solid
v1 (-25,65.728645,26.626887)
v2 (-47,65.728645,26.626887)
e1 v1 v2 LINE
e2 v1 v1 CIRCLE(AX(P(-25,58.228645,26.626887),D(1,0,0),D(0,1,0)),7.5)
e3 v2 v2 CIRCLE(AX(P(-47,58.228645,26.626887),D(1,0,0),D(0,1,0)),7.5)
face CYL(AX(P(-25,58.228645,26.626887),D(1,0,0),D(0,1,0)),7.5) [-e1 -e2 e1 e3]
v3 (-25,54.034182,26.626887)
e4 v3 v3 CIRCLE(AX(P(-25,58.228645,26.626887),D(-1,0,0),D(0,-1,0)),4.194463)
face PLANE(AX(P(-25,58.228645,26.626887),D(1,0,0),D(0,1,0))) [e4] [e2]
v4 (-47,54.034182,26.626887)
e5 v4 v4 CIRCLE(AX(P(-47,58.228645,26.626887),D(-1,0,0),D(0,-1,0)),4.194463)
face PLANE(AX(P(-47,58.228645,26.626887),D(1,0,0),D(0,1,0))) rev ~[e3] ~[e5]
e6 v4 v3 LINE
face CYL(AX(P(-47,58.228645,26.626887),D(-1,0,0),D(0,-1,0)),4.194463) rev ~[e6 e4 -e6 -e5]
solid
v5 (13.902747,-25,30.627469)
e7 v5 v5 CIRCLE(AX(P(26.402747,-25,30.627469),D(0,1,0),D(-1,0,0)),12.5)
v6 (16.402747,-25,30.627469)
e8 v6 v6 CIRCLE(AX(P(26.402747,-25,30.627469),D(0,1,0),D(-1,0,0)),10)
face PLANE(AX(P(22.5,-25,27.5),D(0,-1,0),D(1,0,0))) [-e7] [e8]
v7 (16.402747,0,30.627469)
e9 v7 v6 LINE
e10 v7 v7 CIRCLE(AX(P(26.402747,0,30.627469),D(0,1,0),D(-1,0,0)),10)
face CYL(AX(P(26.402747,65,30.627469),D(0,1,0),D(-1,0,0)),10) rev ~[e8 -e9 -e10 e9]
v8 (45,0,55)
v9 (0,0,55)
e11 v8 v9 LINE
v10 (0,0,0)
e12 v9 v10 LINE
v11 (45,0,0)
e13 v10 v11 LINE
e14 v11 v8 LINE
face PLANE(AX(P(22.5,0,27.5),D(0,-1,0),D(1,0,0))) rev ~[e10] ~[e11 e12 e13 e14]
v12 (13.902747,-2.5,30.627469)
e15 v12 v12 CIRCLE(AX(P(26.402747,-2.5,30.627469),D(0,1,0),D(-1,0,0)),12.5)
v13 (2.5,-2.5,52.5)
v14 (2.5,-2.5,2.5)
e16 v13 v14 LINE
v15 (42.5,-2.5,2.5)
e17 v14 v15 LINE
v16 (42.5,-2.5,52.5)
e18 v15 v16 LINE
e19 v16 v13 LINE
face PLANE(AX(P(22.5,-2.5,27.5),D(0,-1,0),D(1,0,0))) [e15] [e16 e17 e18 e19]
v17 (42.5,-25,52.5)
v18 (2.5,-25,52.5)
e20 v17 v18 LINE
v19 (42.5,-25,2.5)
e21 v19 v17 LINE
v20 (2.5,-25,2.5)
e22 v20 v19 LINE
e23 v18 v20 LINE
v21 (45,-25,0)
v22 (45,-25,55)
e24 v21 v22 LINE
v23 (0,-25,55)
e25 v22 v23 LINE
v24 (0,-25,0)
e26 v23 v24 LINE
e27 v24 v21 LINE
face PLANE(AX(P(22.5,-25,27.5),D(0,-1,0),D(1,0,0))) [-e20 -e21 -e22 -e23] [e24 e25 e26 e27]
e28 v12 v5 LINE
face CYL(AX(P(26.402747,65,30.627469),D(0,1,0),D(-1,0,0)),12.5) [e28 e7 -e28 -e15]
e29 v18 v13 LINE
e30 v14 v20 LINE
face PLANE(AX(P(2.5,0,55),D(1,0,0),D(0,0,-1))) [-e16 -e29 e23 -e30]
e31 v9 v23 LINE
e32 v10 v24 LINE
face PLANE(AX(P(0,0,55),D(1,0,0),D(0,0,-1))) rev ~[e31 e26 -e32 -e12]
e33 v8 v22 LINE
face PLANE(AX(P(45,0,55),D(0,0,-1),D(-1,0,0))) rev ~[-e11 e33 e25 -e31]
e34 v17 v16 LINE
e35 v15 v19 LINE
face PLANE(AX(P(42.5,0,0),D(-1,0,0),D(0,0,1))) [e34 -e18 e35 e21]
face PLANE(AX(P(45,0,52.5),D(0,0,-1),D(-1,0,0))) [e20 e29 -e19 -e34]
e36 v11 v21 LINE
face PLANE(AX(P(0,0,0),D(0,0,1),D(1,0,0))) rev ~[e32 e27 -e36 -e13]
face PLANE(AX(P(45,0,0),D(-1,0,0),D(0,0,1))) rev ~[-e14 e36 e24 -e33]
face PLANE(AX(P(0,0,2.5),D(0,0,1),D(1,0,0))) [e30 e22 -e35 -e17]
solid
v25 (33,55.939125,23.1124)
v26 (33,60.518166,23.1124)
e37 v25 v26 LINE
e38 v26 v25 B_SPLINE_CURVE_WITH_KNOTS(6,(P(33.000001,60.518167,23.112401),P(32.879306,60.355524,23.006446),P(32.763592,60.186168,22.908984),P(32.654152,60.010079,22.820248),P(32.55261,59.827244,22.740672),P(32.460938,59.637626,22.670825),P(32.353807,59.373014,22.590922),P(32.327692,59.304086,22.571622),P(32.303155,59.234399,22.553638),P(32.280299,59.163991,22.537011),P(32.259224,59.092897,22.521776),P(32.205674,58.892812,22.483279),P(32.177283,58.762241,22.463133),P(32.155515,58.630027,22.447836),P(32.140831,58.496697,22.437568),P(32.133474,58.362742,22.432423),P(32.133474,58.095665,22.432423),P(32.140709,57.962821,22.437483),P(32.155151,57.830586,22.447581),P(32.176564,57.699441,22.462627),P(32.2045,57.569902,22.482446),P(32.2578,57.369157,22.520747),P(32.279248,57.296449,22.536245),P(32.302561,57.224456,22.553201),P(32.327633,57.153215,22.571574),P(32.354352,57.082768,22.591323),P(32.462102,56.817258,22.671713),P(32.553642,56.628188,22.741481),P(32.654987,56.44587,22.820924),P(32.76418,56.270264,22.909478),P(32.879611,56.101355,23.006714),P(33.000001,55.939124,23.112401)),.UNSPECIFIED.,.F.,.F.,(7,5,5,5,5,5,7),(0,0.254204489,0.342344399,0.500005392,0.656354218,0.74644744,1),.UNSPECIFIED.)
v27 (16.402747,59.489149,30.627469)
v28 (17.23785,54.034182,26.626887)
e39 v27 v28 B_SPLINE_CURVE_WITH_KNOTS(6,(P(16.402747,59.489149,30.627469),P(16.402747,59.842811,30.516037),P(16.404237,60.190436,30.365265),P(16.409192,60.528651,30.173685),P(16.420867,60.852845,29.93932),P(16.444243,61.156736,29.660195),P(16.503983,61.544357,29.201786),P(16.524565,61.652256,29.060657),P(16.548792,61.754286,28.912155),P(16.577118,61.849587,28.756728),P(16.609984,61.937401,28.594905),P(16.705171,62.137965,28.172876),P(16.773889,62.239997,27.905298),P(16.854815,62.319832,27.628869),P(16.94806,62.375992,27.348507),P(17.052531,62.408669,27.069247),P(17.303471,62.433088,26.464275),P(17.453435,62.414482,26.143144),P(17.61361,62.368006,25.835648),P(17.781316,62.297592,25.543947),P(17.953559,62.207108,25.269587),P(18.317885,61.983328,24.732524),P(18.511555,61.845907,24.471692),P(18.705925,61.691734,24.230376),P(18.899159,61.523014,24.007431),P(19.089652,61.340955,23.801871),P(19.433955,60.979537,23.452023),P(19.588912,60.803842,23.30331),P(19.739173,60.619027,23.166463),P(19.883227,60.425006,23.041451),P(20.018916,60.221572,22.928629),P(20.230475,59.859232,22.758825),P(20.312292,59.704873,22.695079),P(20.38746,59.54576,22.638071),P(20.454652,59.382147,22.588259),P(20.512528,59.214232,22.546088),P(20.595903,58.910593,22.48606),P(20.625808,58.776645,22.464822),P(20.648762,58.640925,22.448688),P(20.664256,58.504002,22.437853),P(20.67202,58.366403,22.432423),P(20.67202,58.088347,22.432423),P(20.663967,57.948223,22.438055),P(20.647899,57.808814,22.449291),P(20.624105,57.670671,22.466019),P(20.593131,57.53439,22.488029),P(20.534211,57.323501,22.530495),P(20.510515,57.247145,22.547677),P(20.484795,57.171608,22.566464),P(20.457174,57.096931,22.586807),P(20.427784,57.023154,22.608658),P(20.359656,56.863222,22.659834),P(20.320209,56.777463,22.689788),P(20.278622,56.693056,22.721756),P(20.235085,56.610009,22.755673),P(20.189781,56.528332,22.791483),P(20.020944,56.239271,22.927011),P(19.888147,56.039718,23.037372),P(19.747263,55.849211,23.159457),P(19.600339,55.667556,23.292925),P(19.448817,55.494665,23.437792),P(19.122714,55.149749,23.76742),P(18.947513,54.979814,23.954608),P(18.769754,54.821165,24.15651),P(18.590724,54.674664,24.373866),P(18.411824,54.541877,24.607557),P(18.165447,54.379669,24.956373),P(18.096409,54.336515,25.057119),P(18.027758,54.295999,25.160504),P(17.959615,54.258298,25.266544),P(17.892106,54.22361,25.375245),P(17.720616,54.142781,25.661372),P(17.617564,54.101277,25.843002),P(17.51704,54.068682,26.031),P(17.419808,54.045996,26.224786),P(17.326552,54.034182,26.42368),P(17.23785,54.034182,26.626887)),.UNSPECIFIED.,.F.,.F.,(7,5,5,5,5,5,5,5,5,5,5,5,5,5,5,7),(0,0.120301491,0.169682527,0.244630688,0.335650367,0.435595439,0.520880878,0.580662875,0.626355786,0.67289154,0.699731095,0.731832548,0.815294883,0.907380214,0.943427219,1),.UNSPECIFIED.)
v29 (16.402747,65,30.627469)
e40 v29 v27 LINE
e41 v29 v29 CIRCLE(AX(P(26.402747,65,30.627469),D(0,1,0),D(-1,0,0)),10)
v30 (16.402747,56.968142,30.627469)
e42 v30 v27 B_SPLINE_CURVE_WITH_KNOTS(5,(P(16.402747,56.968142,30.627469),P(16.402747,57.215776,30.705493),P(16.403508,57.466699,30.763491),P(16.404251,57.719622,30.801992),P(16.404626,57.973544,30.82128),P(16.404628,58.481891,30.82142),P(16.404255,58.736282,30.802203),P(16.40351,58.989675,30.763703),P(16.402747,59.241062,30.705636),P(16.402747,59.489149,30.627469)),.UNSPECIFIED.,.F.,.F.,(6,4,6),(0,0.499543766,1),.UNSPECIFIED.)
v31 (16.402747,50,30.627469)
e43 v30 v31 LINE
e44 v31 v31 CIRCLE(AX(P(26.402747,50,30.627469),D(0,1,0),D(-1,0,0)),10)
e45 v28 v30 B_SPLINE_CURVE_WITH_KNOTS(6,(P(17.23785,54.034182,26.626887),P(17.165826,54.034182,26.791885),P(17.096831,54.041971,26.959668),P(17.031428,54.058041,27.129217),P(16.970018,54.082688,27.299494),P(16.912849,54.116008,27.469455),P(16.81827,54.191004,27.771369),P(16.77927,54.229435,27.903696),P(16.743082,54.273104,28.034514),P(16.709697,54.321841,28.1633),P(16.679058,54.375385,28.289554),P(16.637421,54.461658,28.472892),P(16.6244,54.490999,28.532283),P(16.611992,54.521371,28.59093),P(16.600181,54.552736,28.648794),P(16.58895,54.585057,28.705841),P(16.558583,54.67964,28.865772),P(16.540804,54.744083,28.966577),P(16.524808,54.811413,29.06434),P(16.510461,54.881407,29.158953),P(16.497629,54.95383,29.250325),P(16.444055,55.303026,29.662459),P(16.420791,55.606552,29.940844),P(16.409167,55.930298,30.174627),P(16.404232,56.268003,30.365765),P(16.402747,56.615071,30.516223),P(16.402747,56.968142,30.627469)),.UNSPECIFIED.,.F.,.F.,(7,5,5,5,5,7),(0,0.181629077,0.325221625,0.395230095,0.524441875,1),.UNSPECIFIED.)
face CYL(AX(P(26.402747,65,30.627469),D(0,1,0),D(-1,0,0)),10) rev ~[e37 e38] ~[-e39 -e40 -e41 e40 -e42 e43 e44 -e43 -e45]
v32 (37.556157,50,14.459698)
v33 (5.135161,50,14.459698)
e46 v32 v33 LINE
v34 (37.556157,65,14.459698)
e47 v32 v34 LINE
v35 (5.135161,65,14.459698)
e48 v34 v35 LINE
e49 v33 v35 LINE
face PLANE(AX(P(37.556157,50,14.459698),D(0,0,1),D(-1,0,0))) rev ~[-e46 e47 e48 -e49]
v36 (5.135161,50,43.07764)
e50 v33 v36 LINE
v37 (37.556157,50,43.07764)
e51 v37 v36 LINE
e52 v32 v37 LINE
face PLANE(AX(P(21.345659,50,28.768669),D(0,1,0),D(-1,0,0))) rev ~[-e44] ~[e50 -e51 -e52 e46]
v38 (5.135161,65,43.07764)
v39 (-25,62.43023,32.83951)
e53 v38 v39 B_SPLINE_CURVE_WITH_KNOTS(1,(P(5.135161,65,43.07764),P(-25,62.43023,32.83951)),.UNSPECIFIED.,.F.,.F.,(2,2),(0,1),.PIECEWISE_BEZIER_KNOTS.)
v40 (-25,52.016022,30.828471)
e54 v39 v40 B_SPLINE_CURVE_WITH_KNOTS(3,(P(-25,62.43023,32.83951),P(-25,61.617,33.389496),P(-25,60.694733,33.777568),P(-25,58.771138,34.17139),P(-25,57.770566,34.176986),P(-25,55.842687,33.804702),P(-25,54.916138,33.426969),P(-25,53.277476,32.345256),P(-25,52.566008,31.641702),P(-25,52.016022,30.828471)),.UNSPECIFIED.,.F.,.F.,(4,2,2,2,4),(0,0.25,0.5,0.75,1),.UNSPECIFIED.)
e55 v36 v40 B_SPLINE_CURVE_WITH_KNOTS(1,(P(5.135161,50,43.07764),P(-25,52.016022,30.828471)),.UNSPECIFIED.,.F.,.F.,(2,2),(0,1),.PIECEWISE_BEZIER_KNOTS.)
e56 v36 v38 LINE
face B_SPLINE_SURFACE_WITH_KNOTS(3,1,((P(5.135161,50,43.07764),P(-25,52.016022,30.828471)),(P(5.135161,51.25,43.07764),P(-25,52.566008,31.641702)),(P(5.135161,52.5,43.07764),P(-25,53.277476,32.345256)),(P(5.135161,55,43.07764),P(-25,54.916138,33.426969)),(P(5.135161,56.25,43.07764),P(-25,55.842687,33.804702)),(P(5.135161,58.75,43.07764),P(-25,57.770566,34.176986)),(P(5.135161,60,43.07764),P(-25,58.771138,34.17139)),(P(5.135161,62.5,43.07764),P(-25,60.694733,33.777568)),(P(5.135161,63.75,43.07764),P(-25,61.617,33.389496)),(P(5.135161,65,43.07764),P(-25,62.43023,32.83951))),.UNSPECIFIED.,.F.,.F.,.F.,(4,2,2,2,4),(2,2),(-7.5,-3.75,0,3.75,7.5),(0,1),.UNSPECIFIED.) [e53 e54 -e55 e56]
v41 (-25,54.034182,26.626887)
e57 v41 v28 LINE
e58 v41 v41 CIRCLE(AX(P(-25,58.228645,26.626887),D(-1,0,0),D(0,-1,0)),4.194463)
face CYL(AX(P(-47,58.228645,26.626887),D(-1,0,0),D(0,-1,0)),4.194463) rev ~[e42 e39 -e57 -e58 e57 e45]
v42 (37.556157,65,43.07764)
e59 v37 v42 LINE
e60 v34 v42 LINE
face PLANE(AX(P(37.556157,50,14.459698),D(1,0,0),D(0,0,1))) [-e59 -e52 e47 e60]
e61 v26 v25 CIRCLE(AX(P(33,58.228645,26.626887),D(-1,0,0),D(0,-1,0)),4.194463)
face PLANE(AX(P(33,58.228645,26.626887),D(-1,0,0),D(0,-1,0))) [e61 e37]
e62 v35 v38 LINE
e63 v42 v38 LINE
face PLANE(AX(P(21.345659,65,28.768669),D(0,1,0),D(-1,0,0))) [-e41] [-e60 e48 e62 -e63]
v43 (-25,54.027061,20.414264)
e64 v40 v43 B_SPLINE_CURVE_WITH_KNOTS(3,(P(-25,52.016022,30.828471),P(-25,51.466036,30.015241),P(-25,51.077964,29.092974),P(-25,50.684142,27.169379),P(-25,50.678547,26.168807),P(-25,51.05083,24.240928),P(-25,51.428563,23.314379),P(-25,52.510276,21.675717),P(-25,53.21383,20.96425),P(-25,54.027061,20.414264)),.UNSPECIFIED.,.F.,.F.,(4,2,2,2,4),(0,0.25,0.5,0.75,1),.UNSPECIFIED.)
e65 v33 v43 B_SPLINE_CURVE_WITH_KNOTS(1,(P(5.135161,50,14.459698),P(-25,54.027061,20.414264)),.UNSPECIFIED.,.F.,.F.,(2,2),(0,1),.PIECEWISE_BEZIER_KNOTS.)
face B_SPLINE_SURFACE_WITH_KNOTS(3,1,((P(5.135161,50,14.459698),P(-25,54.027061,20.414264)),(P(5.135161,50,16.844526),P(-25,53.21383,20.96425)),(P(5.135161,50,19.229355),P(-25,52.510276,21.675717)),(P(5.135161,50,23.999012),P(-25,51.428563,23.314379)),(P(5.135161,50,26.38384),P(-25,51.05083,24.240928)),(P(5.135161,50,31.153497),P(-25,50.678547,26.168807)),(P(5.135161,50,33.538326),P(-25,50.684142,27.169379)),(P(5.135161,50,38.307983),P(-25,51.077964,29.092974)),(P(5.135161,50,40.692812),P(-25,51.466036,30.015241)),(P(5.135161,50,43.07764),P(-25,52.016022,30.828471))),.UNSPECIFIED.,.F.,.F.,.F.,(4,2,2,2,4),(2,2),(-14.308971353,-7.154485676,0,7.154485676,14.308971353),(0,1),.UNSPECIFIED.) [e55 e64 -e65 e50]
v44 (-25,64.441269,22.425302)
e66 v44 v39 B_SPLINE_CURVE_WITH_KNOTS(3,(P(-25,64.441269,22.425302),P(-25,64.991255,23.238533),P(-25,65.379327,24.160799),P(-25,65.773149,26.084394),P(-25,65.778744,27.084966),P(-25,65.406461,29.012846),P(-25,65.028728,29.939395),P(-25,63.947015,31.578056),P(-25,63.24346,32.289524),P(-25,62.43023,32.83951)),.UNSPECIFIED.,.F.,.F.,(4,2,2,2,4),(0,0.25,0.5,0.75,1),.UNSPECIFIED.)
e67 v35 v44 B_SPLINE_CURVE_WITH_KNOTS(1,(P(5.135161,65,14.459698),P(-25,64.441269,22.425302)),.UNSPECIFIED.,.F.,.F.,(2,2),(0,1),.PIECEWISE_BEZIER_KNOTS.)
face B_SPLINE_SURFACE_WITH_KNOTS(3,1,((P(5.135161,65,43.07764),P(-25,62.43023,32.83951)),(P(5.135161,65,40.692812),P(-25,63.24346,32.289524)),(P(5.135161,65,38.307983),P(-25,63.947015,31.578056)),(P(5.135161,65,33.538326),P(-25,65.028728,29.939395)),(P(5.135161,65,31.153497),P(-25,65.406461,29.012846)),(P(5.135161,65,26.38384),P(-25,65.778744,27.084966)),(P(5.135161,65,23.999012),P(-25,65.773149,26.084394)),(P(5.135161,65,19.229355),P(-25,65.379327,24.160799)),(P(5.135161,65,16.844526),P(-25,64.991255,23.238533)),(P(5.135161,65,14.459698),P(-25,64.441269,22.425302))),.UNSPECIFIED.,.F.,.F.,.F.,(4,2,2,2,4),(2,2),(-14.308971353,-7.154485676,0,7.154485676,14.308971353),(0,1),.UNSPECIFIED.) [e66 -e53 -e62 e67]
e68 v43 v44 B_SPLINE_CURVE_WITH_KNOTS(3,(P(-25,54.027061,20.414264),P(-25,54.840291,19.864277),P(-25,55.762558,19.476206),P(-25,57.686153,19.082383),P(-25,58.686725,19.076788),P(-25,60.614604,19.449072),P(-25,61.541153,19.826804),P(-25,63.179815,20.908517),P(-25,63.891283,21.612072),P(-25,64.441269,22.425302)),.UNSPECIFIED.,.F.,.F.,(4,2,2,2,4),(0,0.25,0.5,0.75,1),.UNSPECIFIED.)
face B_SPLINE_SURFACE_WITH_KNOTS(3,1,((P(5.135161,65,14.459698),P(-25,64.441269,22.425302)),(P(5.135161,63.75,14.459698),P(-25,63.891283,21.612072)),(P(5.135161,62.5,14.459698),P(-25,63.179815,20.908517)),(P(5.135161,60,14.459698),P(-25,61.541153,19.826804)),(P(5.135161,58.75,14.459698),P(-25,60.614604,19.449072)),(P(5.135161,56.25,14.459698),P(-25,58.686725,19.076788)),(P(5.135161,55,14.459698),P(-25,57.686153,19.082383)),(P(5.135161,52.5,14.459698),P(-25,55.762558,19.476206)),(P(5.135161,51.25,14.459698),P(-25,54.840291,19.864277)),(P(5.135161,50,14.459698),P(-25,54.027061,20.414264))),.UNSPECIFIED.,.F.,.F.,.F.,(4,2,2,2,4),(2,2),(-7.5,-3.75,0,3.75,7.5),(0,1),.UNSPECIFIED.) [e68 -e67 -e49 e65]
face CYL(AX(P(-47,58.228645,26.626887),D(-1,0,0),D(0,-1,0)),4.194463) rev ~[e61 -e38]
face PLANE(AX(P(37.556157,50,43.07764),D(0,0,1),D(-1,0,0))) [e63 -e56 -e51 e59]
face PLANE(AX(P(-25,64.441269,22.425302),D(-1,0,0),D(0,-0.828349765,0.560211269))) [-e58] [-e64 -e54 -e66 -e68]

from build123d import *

# Parameters (mm, degrees)
F1_DEPTH  = 25
F4_W      = 32.4209956452
F4_H      = 28.6179427058
F5_DEPTH  = 15
F8_R      = 7.5
F9_DEPTH  = 22
F5_FACE_W = 15
F5_FACE_H = 28.6179427058
F12_R     = 5.1897115041
F13_DEPTH = 25
F14_R     = 10
F15_DEPTH = 200
F16_R     = 4.1944634135
F17_DEPTH = 80
F18_T     = -2.5


# Not quite as in the source:
# - the arcs of a loft's sections are written as splines that run evenly, so that the points pair up as in the source's solid
# - a feature names something its author has since deleted; it is built from what else it names
# - the program builds the solid bodies; features that only make, move or delete a surface that nothing else refers to are left out


with BuildPart() as f1:
    # F0 (on Front) → F1 (new body)
    with BuildSketch(Plane.XZ):
        Polygon((0, 55), (0, 0), (45, 0), (45, 55), (31.3274413347, 55), (12.6162180677, 55), align=None)
    extrude(amount=F1_DEPTH)

    # F12 (on face) → F13 (cut)
    with BuildSketch(Plane(origin=(44.024232716, 6.5541899568, 0), x_dir=(-0.1472539216, 0.9890987224, 0), z_dir=(0.9890987224, 0.1472539216, 0))):
        with Locations((18.0149693042, 30.8930817991)):
            Circle(F12_R)
    extrude(amount=-F13_DEPTH, mode=Mode.SUBTRACT)


with BuildPart() as f5:
    # F4 (on offset) → F5 (new body)
    with BuildSketch(Plane(origin=(0, 50, 0), x_dir=(-1, 0, 0), z_dir=(0, 1, 0))):
        with Locations((-21.3456586935, 28.7686688825)):
            Rectangle(F4_W, F4_H)
    extrude(amount=F5_DEPTH)

    # F5_face (on face) → F10 section 0
    with BuildSketch(Plane(origin=(5.1351608709, 57.5, 28.7686688825), x_dir=(0, -1, 0), z_dir=(-1, 0, 0))):
        Rectangle(F5_FACE_W, F5_FACE_H)
    # F9_face (on face) → F10 section 1
    with BuildSketch(Plane(origin=(-25, 58.2286454737, 26.6268867999), x_dir=(0, 1, 0), z_dir=(1, 0, 0))):
        with BuildLine():
            add(Edge.make_bspline(
                [(-4.2015845208, -6.2126232394), (-3.3883540404, -6.7626093671), (-2.4660875327, -7.1506811449), (-0.5424923825, -7.5445033349), (0.4580794074, -7.5500987948), (2.385958823, -7.177815061), (3.3125079103, -6.800082345), (4.9511694264, -5.7183695112), (5.6626371118, -5.0148150011), (6.2126232394, -4.2015845208)],
                knots=[0, 0, 0, 0, 0.25, 0.25, 0.5, 0.5, 0.75, 0.75, 1, 1, 1, 1], degree=3))
            add(Edge.make_bspline(
                [(6.2126232394, -4.2015845208), (6.7626093671, -3.3883540404), (7.1506811449, -2.4660875327), (7.5445033349, -0.5424923825), (7.5500987948, 0.4580794074), (7.177815061, 2.385958823), (6.800082345, 3.3125079103), (5.7183695112, 4.9511694264), (5.0148150011, 5.6626371118), (4.2015845208, 6.2126232394)],
                knots=[0, 0, 0, 0, 0.25, 0.25, 0.5, 0.5, 0.75, 0.75, 1, 1, 1, 1], degree=3))
            add(Edge.make_bspline(
                [(4.2015845208, 6.2126232394), (3.3883540404, 6.7626093671), (2.4660875327, 7.1506811449), (0.5424923825, 7.5445033349), (-0.4580794074, 7.5500987948), (-2.385958823, 7.177815061), (-3.3125079103, 6.800082345), (-4.9511694264, 5.7183695112), (-5.6626371118, 5.0148150011), (-6.2126232394, 4.2015845208)],
                knots=[0, 0, 0, 0, 0.25, 0.25, 0.5, 0.5, 0.75, 0.75, 1, 1, 1, 1], degree=3))
            add(Edge.make_bspline(
                [(-6.2126232394, 4.2015845208), (-6.7626093671, 3.3883540404), (-7.1506811449, 2.4660875327), (-7.5445033349, 0.5424923825), (-7.5500987948, -0.4580794074), (-7.177815061, -2.385958823), (-6.800082345, -3.3125079103), (-5.7183695112, -4.9511694264), (-5.0148150011, -5.6626371118), (-4.2015845208, -6.2126232394)],
                knots=[0, 0, 0, 0, 0.25, 0.25, 0.5, 0.5, 0.75, 0.75, 1, 1, 1, 1], degree=3))
        make_face()
    loft(ruled=True)


with BuildPart() as f9:
    # F8 (on offset) → F9 (new body)
    with BuildSketch(Plane.YZ.offset(-25)):
        with Locations((58.2286454737, 26.6268867999)):
            Circle(F8_R)
    extrude(amount=-F9_DEPTH)


with BuildPart() as f15_tool:
    # F14 (on face) → F15 (new body)
    with BuildSketch(Plane(origin=(0, 65, 0), x_dir=(-1, 0, 0), z_dir=(0, 1, 0))):
        with Locations((-26.4027472585, 30.6274686009)):
            Circle(F14_R)
    extrude(amount=-F15_DEPTH)


with BuildPart() as f1_1:
    add(f1.part)

    # F15: cut by f15_tool
    add(f15_tool.part, mode=Mode.SUBTRACT)

    # F18
    f18_openings = [f1_1.faces().sort_by_distance(p)[0] for p in [
        (0.710634, -25, 27.5),
    ]]
    offset(amount=F18_T, openings=f18_openings)


with BuildPart() as f5_1:
    add(f5.part)

    # F15: cut by f15_tool
    add(f15_tool.part, mode=Mode.SUBTRACT)


with BuildPart() as f17_tool:
    # F16 (on face) → F17 (new body)
    with BuildSketch(Plane(origin=(-47, 0, 0), x_dir=(0, -1, 0), z_dir=(-1, 0, 0))):
        with Locations((-58.2286454737, 26.6268867999)):
            Circle(F16_R)
    extrude(amount=-F17_DEPTH)


with BuildPart() as f5_2:
    add(f5_1.part)

    # F17: cut by f17_tool
    add(f17_tool.part, mode=Mode.SUBTRACT)


with BuildPart() as f9_1:
    add(f9.part)

    # F17: cut by f17_tool
    add(f17_tool.part, mode=Mode.SUBTRACT)


solid = Compound([f1_1.part, f5_2.part, f9_1.part])
